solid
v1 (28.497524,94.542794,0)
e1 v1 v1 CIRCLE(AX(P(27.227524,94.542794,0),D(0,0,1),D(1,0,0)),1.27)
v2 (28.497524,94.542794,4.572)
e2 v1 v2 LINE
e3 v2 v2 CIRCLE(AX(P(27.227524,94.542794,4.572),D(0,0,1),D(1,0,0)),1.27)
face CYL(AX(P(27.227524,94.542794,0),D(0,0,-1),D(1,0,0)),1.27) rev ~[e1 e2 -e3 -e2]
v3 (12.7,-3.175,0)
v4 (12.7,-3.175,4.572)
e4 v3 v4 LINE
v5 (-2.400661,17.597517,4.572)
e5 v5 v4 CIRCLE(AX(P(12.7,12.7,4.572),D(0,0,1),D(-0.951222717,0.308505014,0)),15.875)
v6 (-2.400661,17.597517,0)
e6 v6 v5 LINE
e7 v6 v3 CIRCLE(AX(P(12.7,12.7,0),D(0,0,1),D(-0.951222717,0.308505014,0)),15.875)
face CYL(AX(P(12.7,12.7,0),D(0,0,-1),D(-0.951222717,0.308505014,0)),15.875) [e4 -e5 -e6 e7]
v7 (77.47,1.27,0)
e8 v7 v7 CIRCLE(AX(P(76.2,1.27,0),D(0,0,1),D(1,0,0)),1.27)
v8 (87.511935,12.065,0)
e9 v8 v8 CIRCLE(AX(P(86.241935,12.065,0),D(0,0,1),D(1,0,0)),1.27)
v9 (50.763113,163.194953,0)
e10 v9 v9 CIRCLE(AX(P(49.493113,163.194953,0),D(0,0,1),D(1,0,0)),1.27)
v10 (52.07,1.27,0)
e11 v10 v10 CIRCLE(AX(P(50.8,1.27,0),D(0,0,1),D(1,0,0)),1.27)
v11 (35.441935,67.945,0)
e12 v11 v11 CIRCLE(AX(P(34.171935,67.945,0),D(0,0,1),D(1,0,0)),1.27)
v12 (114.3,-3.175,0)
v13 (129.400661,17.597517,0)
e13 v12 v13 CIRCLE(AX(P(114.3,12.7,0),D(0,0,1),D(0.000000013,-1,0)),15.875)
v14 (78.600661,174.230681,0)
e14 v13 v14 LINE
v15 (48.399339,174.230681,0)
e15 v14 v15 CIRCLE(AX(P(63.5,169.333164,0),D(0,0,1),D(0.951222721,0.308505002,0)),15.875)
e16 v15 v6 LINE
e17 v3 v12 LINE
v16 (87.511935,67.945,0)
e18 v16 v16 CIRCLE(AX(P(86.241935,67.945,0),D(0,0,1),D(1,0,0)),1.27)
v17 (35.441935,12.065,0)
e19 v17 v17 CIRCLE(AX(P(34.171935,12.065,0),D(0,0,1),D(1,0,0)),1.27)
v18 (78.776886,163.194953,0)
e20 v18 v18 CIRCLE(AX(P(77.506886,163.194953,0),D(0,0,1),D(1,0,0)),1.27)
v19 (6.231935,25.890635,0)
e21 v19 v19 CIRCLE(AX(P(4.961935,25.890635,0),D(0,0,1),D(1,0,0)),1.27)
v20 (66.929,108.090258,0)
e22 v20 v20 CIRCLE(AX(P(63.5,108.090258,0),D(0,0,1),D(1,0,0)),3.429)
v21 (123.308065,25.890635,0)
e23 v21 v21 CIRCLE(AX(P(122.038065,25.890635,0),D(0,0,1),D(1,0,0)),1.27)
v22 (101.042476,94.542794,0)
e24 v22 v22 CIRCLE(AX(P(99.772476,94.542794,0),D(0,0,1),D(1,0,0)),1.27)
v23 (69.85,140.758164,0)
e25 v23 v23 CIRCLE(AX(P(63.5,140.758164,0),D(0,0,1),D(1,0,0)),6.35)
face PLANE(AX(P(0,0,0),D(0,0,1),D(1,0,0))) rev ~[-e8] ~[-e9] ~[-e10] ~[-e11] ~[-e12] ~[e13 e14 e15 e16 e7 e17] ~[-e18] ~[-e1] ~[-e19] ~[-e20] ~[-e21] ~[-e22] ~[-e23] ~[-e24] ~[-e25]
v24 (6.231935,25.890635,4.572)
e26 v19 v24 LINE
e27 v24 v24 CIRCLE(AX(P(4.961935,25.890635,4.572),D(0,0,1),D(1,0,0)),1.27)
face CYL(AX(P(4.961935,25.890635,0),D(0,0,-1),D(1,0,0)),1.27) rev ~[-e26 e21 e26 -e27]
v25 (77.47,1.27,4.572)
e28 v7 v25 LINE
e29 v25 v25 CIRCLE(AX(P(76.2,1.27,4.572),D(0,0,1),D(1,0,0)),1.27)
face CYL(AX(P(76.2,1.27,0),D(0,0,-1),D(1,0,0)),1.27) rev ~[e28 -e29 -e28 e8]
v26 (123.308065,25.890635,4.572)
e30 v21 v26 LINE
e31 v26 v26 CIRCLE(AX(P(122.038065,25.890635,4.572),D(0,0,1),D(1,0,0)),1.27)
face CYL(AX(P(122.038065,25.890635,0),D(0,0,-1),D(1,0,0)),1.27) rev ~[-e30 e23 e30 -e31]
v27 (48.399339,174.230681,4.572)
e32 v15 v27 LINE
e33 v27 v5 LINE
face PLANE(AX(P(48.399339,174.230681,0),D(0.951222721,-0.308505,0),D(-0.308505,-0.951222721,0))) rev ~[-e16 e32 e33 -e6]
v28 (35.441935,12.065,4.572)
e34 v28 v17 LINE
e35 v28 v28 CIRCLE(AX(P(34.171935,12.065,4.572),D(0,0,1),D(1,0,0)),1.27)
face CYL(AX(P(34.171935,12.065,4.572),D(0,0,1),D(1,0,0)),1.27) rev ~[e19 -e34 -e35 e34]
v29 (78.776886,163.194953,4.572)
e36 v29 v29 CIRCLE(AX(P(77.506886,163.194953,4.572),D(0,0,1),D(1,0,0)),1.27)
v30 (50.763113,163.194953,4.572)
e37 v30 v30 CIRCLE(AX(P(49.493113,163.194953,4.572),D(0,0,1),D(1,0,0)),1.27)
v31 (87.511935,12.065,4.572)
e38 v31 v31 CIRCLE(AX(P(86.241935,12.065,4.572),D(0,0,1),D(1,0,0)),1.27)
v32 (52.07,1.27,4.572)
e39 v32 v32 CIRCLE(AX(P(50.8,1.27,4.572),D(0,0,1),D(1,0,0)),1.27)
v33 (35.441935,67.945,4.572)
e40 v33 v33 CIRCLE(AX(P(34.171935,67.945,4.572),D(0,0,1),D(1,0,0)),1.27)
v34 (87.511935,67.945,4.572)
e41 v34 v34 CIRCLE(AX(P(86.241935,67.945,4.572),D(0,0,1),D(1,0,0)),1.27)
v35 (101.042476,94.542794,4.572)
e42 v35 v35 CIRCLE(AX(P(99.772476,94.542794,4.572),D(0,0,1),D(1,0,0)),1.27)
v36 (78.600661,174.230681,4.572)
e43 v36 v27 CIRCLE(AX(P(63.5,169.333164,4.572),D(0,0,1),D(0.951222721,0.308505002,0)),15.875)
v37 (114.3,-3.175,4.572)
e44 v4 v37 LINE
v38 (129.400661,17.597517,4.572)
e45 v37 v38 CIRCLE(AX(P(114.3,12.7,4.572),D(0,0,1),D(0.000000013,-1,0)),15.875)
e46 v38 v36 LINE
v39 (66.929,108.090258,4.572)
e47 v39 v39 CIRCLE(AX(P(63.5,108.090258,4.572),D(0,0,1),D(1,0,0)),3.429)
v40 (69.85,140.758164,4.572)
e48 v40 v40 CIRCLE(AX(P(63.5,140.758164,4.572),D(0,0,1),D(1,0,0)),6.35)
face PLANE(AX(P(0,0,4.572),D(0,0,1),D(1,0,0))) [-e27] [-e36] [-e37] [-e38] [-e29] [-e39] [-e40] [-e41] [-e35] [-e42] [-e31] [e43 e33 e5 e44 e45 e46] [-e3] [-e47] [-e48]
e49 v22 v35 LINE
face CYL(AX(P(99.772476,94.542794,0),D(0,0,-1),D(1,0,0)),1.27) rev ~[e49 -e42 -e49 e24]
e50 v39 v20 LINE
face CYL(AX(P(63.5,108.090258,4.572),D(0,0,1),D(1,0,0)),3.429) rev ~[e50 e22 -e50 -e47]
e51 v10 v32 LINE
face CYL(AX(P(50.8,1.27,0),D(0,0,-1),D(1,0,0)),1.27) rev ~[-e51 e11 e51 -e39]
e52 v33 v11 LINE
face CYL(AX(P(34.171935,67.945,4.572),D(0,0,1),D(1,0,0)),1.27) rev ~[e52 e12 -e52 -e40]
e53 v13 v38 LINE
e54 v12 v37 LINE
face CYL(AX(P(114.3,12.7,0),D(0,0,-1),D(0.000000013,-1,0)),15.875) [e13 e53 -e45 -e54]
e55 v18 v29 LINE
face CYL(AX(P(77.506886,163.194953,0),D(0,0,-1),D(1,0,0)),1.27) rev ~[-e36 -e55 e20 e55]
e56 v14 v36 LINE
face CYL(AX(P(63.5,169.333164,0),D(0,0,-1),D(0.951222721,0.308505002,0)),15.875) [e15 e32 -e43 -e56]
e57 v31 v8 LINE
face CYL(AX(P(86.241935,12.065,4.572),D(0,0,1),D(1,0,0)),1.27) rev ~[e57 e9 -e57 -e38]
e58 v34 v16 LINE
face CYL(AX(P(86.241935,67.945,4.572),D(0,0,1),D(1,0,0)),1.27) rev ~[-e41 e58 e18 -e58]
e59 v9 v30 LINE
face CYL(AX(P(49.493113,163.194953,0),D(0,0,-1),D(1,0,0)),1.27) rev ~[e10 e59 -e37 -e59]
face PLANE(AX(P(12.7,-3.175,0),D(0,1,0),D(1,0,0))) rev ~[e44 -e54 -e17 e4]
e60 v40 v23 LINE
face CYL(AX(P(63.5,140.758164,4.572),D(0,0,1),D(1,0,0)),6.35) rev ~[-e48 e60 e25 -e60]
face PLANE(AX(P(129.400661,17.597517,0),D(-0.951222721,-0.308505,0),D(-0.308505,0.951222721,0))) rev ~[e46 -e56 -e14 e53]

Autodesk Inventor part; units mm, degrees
ref_plane "YZ Plane" through (0, 0, 0) normal (1, 0, 0) x (0, 1, 0)
ref_plane "XZ Plane" through (0, 0, 0) normal (0, 1, 0) x (-1, 0, 0)
sketch "Sketch1" plane through (0, 0, 0) normal (0, 0, 1) x (1, 0, 0)
  arc A0 (-2.400661, 17.597517) -> (12.7, -3.175) centre (12.7, 12.7) ccw
  arc A1 (114.3, -3.175) -> (129.400661, 17.597517) centre (114.3, 12.7) ccw
  line L0 (114.3, -3.175) -> (12.7, -3.175)
  line L1 (48.399339, 174.230681) -> (-2.400661, 17.597517)
  line L2 (129.400661, 17.597517) -> (78.600661, 174.230681)
  arc A2 (78.600661, 174.230681) -> (48.399339, 174.230681) centre (63.5, 169.333164) ccw
  arc A3 (75.580529, 173.251177) -> (51.419471, 173.251177) centre (63.5, 169.333164) ccw
  arc A4 (0.619471, 16.618013) -> (12.7, 0) centre (12.7, 12.7) ccw
  arc A5 (114.3, 0) -> (126.380529, 16.618013) centre (114.3, 12.7) ccw
  line L3 (12.7, 0) -> (114.3, 0)
  line L4 (0.619471, 16.618013) -> (51.419471, 173.251177)
  line L5 (75.580529, 173.251177) -> (126.380529, 16.618013)
  line L6 (0.619471, 16.618013) -> (3.753882, 26.282436)
  line L7 (3.753882, 26.282436) -> (4.961935, 25.890635)
  circle A6 centre (4.961935, 25.890635) radius 1.27
  line L8 (51.419471, 173.251177) -> (48.285061, 163.586755)
  line L9 (48.285061, 163.586755) -> (49.493113, 163.194953)
  circle A7 centre (49.493113, 163.194953) radius 1.27
  circle A8 centre (27.227524, 94.542794) radius 1.27
  line L10 (75.580529, 173.251177) -> (78.714939, 163.586755)
  line L11 (78.714939, 163.586755) -> (77.506886, 163.194953)
  circle A9 centre (77.506886, 163.194953) radius 1.27
  line L12 (126.380529, 16.618013) -> (123.246118, 26.282436)
  line L13 (123.246118, 26.282436) -> (122.038065, 25.890635)
  circle A10 centre (122.038065, 25.890635) radius 1.27
  circle A11 centre (99.772476, 94.542794) radius 1.27
  line L14 (63.5, 0) -> (63.5, 1.27) construction
  line L15 (63.5, 1.27) -> (76.2, 1.27) construction
  line L16 (63.5, 1.27) -> (50.8, 1.27) construction
  circle A12 centre (50.8, 1.27) radius 1.27
  circle A13 centre (76.2, 1.27) radius 1.27
  point P0 (0, 0)
  point P1 (0, 0)
  dimension "d50" = 2.54
  dimension "d53" = 2.54
  dimension "d39" = 31.75
  dimension "d40" = 31.75
  dimension "d41" = 25.4
  dimension "d42" = 25.4
  dimension "d43" = 25.4
  dimension "d44" = 10.16
  dimension "d45" = 10.16
  dimension "d46" = 1.27
  dimension "d47" = 1.27
  dimension "d48" = 10.16
  dimension "d49" = 10.16
  dimension "d51" = 2.54
  dimension "d52" = 2.54
  dimension "d91" = 12.7
  dimension "d92" = 12.7
ref_plane "Work Plane1" through (0, 0, 4.572) normal (0, 0, 1) x (1, 0, 0)
sketch "Sketch2" plane through (0, 0, 4.572) normal (0, 0, 1) x (1, 0, 0)
  line L0 (12.7, -3.175) -> (114.3, -3.175)
  line L1 (34.171935, 12.065) -> (34.171935, 67.945) construction
  line L2 (34.171935, 67.945) -> (86.241935, 67.945) construction
  line L3 (86.241935, 67.945) -> (86.241935, 12.065) construction
  line L4 (86.241935, 12.065) -> (34.171935, 12.065) construction
  line L5 (34.171935, 12.065) -> (86.241935, 67.945) construction
  line L6 (34.171935, 67.945) -> (86.241935, 12.065) construction
  circle A0 centre (34.171935, 67.945) radius 1.27
  circle A1 centre (34.171935, 12.065) radius 1.27
  circle A2 centre (86.241935, 12.065) radius 1.27
  circle A3 centre (86.241935, 67.945) radius 1.27
  circle A4 centre (4.961935, 25.890635) radius 1.27
  circle A5 centre (63.5, 140.758164) radius 6.35
  arc A6 (78.600661, 174.230681) -> (48.399339, 174.230681) centre (63.5, 169.333164) ccw
  circle A7 centre (63.5, 108.090258) radius 3.429
  point P0 (0, 0)
  point P1 (60.206935, 40.005)
  dimension "d71" = 55.88
  dimension "d73" = 52.07
  dimension "d74" = 2.54
  dimension "d75" = 2.54
  dimension "d76" = 2.54
  dimension "d77" = 2.54
  dimension "d80" = 52.07
  dimension "d81" = 15.24
  dimension "d82" = 29.21
  dimension "d84" = 12.7
  dimension "d87" = 38.1
  dimension "d88" = 6.858
sketch "Sketch1 outline for Extrusion8" plane through (0, 0, 0) normal (0, 0, 1) x (1, 0, 0)
  arc A0 (78.600661, 174.230681) -> (48.399339, 174.230681) centre (63.5, 169.333164) ccw
  line L0 (129.400661, 17.597517) -> (78.600661, 174.230681)
  line L1 (48.399339, 174.230681) -> (-2.400661, 17.597517)
  arc A1 (114.3, -3.175) -> (129.400661, 17.597517) centre (114.3, 12.7) ccw
  arc A2 (-2.400661, 17.597517) -> (12.7, -3.175) centre (12.7, 12.7) ccw
  line L2 (12.7, -3.175) -> (114.3, -3.175)
  circle A3 centre (4.961935, 25.890635) radius 1.27
  circle A4 centre (50.8, 1.27) radius 1.27
  circle A5 centre (76.2, 1.27) radius 1.27
  circle A6 centre (122.038065, 25.890635) radius 1.27
  circle A7 centre (27.227524, 94.542794) radius 1.27
  circle A8 centre (49.493113, 163.194953) radius 1.27
  circle A9 centre (99.772476, 94.542794) radius 1.27
  circle A10 centre (77.506886, 163.194953) radius 1.27
extrude "Extrusion8" add sketch "Sketch1 outline for Extrusion8" along normal blind 4.572
extrude "Extrusion9" cut sketch "Sketch2" against normal blind 4.572 contours A0 | A1 | A2 | A3 | A5 | A7
properties part number "Nathan_LED_Speaker_Back"
